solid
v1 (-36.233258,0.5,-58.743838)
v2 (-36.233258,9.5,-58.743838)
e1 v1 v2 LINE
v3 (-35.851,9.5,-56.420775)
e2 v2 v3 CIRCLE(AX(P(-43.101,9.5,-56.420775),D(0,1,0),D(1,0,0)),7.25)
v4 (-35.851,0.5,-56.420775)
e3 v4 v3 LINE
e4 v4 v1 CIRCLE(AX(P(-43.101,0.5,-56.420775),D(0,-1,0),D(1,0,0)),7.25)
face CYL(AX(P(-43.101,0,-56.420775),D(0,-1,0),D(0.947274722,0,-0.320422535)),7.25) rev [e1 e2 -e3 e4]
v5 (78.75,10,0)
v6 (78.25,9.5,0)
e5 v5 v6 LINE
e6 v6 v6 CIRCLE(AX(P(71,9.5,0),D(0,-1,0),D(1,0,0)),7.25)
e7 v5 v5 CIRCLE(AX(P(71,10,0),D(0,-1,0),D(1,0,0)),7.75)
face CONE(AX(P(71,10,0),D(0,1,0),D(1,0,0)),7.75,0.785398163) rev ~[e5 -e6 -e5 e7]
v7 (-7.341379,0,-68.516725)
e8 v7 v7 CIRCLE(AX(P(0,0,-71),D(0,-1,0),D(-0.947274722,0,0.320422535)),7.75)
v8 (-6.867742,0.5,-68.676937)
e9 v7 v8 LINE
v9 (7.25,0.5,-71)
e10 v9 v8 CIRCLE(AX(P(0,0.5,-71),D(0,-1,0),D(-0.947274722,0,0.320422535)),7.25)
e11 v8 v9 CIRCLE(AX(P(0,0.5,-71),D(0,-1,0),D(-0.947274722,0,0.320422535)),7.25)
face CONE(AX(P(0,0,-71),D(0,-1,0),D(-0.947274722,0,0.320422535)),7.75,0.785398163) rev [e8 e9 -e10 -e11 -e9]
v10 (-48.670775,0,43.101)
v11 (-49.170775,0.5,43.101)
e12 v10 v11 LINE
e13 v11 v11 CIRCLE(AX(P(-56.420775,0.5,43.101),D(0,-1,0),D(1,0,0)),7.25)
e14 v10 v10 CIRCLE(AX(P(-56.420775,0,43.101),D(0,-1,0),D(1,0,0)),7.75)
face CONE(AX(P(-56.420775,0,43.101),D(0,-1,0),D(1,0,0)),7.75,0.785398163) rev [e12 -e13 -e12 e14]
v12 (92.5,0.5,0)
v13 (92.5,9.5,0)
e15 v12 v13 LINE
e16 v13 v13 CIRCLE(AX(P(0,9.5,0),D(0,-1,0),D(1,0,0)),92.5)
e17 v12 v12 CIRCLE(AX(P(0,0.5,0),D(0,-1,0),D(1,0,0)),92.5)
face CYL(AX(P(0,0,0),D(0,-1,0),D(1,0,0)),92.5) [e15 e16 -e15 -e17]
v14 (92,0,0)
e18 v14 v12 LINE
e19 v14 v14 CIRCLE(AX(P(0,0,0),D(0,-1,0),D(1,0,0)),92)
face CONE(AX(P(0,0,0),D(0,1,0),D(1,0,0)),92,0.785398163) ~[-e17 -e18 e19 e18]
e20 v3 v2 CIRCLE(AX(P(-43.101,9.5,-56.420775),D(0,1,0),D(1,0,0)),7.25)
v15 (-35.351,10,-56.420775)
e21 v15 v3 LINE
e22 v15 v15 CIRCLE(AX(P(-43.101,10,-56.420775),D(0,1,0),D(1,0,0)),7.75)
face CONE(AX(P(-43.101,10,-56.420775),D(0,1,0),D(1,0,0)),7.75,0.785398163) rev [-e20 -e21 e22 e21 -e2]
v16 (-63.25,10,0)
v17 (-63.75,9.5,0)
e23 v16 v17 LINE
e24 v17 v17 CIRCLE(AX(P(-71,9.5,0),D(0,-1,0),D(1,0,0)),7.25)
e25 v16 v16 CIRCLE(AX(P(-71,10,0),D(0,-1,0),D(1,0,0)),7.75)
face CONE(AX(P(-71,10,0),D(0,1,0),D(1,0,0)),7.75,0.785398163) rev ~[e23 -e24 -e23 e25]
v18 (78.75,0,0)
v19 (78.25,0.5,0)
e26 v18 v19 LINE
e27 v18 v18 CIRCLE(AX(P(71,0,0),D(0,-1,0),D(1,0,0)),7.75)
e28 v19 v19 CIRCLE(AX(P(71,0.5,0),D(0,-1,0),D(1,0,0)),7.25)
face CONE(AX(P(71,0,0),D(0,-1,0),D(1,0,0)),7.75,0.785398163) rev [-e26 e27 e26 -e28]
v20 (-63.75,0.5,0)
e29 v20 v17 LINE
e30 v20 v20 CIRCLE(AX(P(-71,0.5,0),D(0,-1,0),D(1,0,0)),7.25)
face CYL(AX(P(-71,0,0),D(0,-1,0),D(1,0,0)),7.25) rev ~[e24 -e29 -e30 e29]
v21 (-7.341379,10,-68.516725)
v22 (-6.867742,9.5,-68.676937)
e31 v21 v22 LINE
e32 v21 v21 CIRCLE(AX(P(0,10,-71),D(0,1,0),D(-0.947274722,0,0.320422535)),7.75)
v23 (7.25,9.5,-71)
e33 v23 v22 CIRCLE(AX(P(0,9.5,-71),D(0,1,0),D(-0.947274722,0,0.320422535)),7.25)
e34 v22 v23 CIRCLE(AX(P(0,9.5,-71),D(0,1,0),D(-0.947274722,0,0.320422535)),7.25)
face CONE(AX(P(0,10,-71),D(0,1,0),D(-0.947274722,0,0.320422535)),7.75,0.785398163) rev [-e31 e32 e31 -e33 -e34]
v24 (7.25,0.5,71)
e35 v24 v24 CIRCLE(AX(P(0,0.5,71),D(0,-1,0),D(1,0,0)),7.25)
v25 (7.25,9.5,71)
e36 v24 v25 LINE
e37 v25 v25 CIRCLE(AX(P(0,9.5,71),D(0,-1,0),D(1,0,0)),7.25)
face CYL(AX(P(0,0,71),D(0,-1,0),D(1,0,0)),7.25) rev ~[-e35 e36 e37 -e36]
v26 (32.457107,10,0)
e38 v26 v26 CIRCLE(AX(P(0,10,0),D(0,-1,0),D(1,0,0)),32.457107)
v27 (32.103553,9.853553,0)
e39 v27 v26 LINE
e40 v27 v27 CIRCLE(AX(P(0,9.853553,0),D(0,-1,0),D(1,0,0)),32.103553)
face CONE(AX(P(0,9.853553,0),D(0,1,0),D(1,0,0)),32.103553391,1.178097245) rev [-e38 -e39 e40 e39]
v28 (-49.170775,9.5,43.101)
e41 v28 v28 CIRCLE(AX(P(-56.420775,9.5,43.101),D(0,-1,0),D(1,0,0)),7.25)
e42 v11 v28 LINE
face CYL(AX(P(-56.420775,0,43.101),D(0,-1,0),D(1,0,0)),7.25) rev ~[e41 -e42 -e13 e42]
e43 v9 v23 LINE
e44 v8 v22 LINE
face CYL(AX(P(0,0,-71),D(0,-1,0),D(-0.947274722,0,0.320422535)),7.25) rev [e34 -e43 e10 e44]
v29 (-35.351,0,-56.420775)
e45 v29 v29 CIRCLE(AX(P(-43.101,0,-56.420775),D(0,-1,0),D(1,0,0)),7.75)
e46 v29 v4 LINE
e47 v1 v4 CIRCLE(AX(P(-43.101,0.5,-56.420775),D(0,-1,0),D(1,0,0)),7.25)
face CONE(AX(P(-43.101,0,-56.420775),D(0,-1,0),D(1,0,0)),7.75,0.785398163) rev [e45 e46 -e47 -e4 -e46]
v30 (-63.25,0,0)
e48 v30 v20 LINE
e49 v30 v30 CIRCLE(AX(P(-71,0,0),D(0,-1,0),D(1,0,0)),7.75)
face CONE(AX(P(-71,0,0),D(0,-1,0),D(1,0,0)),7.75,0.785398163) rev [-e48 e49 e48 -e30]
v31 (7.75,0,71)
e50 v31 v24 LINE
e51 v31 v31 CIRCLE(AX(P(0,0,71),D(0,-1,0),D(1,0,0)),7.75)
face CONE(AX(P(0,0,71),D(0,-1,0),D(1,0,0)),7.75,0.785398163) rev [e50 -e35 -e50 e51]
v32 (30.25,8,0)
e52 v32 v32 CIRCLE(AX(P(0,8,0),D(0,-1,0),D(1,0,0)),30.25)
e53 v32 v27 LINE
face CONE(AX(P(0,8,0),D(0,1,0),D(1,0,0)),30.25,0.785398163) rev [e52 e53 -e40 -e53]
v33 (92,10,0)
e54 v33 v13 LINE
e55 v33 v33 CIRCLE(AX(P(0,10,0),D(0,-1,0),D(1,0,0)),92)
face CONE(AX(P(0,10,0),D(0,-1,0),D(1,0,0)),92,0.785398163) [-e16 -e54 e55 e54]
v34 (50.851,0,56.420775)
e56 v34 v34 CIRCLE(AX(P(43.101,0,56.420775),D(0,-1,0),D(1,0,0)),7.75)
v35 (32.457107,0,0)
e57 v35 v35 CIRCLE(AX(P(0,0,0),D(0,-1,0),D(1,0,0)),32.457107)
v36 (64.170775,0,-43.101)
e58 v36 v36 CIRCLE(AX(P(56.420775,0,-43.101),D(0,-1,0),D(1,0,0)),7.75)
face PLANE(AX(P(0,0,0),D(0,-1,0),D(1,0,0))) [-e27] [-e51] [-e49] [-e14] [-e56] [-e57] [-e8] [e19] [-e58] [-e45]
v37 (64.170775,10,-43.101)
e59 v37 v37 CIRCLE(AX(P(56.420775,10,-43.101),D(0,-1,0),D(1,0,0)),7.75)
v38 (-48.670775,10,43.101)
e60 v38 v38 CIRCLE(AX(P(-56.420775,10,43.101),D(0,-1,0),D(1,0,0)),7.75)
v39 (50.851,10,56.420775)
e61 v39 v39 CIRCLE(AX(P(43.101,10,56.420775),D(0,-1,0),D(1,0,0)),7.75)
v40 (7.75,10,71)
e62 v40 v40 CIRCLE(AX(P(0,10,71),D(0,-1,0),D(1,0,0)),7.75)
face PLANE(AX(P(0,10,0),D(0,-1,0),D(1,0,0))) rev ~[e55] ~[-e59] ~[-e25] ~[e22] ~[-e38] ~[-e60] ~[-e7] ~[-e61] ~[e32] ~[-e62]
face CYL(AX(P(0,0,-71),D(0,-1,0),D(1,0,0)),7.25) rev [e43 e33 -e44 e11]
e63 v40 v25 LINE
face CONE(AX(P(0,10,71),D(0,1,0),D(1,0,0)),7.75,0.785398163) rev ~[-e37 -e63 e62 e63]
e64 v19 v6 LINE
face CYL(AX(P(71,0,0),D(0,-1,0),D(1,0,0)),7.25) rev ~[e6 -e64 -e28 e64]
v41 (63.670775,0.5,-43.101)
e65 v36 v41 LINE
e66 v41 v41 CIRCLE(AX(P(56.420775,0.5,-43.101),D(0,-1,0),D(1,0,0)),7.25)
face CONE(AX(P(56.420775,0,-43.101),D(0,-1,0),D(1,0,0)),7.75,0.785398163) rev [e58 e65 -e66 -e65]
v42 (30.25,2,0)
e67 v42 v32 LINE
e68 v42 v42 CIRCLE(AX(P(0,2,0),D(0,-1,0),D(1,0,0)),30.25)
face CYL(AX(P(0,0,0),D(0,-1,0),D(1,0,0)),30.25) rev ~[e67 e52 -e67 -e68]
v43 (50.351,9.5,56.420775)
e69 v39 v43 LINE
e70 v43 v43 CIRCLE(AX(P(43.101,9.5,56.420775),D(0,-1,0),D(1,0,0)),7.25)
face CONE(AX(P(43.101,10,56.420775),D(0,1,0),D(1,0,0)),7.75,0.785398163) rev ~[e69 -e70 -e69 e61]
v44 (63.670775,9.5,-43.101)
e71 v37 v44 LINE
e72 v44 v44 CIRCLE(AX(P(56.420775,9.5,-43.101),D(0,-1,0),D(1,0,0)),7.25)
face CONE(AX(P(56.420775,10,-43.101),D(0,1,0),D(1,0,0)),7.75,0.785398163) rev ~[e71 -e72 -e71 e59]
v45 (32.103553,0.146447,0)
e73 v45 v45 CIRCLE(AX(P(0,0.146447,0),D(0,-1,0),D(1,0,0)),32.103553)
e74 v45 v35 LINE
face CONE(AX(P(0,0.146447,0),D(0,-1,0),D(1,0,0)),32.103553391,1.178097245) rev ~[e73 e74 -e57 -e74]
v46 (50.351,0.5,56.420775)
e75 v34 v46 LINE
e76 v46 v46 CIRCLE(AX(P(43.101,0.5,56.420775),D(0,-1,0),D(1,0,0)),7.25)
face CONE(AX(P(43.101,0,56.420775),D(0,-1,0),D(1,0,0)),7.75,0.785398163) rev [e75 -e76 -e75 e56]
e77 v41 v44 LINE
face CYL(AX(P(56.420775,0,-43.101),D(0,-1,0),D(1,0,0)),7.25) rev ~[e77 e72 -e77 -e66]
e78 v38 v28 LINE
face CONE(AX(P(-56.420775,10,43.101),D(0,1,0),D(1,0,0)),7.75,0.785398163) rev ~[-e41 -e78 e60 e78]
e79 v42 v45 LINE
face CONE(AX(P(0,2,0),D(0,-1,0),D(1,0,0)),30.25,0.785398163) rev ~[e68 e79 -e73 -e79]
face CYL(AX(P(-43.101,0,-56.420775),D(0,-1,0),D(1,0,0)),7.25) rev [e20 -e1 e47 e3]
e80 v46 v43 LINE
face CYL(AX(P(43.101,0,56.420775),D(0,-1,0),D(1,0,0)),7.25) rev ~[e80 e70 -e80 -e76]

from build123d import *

# Parameters (mm, degrees)
F0_R     = 92.5
F0_R_2   = 7.25
F0_R_3   = 30.25
F1_DEPTH = 10
F2_SIZE2 = 2
F2_SIZE  = 2
F3_SIZE2 = 2
F3_SIZE  = 2


# Not quite as in the source:
# - a fillet or chamfer that OpenCascade refuses, or shapes differently, is made with other operations: its cross-section is extruded or revolved along the edge and cut away or added


with BuildPart() as f1:
    # F0 (on Front) → F1 (new body)
    with BuildSketch(Plane.XZ):
        Circle(F0_R)
        with BuildLine():
            ThreePointArc((-35.8509998507, -56.4207746479), (-35.9472026921, -57.5979263852), (-36.2332581163, -58.7438380282))
            ThreePointArc((-36.2332581163, -58.7438380282), (-50.2547970094, -55.2436229106), (-35.8509998507, -56.4207746479))
        make_face(mode=Mode.SUBTRACT)
        with BuildLine():
            ThreePointArc((-6.8677417345, -68.6769366197), (1.1771517373, -63.8462028413), (7.25, -71))
            ThreePointArc((7.25, -71), (-1.1771517373, -78.1537971587), (-6.8677417345, -68.6769366197))
        make_face(mode=Mode.SUBTRACT)
        with Locations((56.4207746479, -43.1009998507)):
            Circle(F0_R_2, mode=Mode.SUBTRACT)
        with Locations((-71, 0)):
            Circle(F0_R_2, mode=Mode.SUBTRACT)
        with Locations((-56.4207746479, 43.1009998507)):
            Circle(F0_R_2, mode=Mode.SUBTRACT)
        Circle(F0_R_3, mode=Mode.SUBTRACT)
        with Locations((71, 0)):
            Circle(F0_R_2, mode=Mode.SUBTRACT)
        with Locations((43.1009998507, 56.4207746479)):
            Circle(F0_R_2, mode=Mode.SUBTRACT)
        with Locations((0, 71)):
            Circle(F0_R_2, mode=Mode.SUBTRACT)
    extrude(amount=-F1_DEPTH)

    # F2
    f2_edges = [f1.edges().sort_by_distance(p)[0] for p in [
        (-30.25, 0, 0),
    ]]
    chamfer(f2_edges, length=F2_SIZE, length2=F2_SIZE2)

    # F3
    f3_edges = [f1.edges().sort_by_distance(p)[0] for p in [
        (-30.25, 10, 0),
    ]]
    chamfer(f3_edges, length=F3_SIZE, length2=F3_SIZE2)

    # F4: chamfer of 0.5 on 10 edges, made by hand

    # F4_s1 → F4_t2 (revolve, cut)
    with BuildSketch(Plane.XY):
        Polygon((32.1035533906, 9.8535533906), (32.4571067812, 10), (32.25, 10), align=None)
    revolve(axis=Axis((0, 10, 0), (0, -1, 0)), mode=Mode.SUBTRACT)

    # F4_s3 → F4_t4 (revolve, cut)
    with BuildSketch(Plane.XY):
        Polygon((92, 10), (92.5, 9.5), (92.5, 10), align=None)
    revolve(axis=Axis((0, 10, 0), (0, -1, 0)), mode=Mode.SUBTRACT)

    # F4_s5 → F4_t6 (revolve, cut)
    with BuildSketch(Plane.XY.offset(-56.4207746479)):
        Polygon((-35.3509998507, 10), (-35.8509998507, 9.5), (-35.8509998507, 10), align=None)
    revolve(axis=Axis((-43.1009998507, 10, -56.4207746479), (0, 1, 0)), mode=Mode.SUBTRACT)

    # F4_s7 → F4_t8 (revolve, cut)
    with BuildSketch(Plane(origin=(-21.5504999254, 0, -63.7103873239), x_dir=(0, 1, 0), z_dir=(-0.3204225352, 0, -0.947274722))):
        Polygon((10, 15), (9.5, 15.5), (10, 15.5), align=None)
    revolve(axis=Axis((0, 10, -71), (0, 1, 0)), mode=Mode.SUBTRACT)

    # F4_s9 → F4_t10 (revolve, cut)
    with BuildSketch(Plane.XY.offset(-43.1009998507)):
        Polygon((64.1707746479, 10), (63.6707746479, 9.5), (63.6707746479, 10), align=None)
    revolve(axis=Axis((56.4207746479, 10, -43.1009998507), (0, -1, 0)), mode=Mode.SUBTRACT)

    # F4_s11 → F4_t12 (revolve, cut)
    with BuildSketch(Plane.XY):
        Polygon((-63.25, 10), (-63.75, 9.5), (-63.75, 10), align=None)
    revolve(axis=Axis((-71, 10, 0), (0, -1, 0)), mode=Mode.SUBTRACT)

    # F4_s13 → F4_t14 (revolve, cut)
    with BuildSketch(Plane.XY.offset(43.1009998507)):
        Polygon((-48.6707746479, 10), (-49.1707746479, 9.5), (-49.1707746479, 10), align=None)
    revolve(axis=Axis((-56.4207746479, 10, 43.1009998507), (0, -1, 0)), mode=Mode.SUBTRACT)

    # F4_s15 → F4_t16 (revolve, cut)
    with BuildSketch(Plane.XY):
        Polygon((78.75, 10), (78.25, 9.5), (78.25, 10), align=None)
    revolve(axis=Axis((71, 10, 0), (0, -1, 0)), mode=Mode.SUBTRACT)

    # F4_s17 → F4_t18 (revolve, cut)
    with BuildSketch(Plane.XY.offset(56.4207746479)):
        Polygon((50.8509998507, 10), (50.3509998507, 9.5), (50.3509998507, 10), align=None)
    revolve(axis=Axis((43.1009998507, 10, 56.4207746479), (0, -1, 0)), mode=Mode.SUBTRACT)

    # F4_s19 → F4_t20 (revolve, cut)
    with BuildSketch(Plane.XY.offset(71)):
        Polygon((7.75, 10), (7.25, 9.5), (7.25, 10), align=None)
    revolve(axis=Axis((0, 10, 71), (0, -1, 0)), mode=Mode.SUBTRACT)

    # F5: chamfer of 0.5 on 10 edges, made by hand

    # F5_s1 → F5_t2 (revolve, cut)
    with BuildSketch(Plane.XY):
        Polygon((32.1035533906, 0.1464466094), (32.4571067812, 0), (32.25, 0), align=None)
    revolve(axis=Axis((0, 0, 0), (0, -1, 0)), mode=Mode.SUBTRACT)

    # F5_s3 → F5_t4 (revolve, cut)
    with BuildSketch(Plane.XY):
        Polygon((92, 0), (92.5, 0.5), (92.5, 0), align=None)
    revolve(axis=Axis((0, 0, 0), (0, -1, 0)), mode=Mode.SUBTRACT)

    # F5_s5 → F5_t6 (revolve, cut)
    with BuildSketch(Plane.XY.offset(-56.4207746479)):
        Polygon((-35.3509998507, 0), (-35.8509998507, 0.5), (-35.8509998507, 0), align=None)
    revolve(axis=Axis((-43.1009998507, 0, -56.4207746479), (0, -1, 0)), mode=Mode.SUBTRACT)

    # F5_s7 → F5_t8 (revolve, cut)
    with BuildSketch(Plane(origin=(-21.5504999254, 0, -63.7103873239), x_dir=(0, 1, 0), z_dir=(0.3204225352, 0, 0.947274722))):
        Polygon((0, -15), (0.5, -15.5), (0, -15.5), align=None)
    revolve(axis=Axis((0, 0, -71), (0, -1, 0)), mode=Mode.SUBTRACT)

    # F5_s9 → F5_t10 (revolve, cut)
    with BuildSketch(Plane.XY.offset(-43.1009998507)):
        Polygon((64.1707746479, 0), (63.6707746479, 0.5), (63.6707746479, 0), align=None)
    revolve(axis=Axis((56.4207746479, 0, -43.1009998507), (0, -1, 0)), mode=Mode.SUBTRACT)

    # F5_s11 → F5_t12 (revolve, cut)
    with BuildSketch(Plane.XY):
        Polygon((-63.25, 0), (-63.75, 0.5), (-63.75, 0), align=None)
    revolve(axis=Axis((-71, 0, 0), (0, -1, 0)), mode=Mode.SUBTRACT)

    # F5_s13 → F5_t14 (revolve, cut)
    with BuildSketch(Plane.XY.offset(43.1009998507)):
        Polygon((-48.6707746479, 0), (-49.1707746479, 0.5), (-49.1707746479, 0), align=None)
    revolve(axis=Axis((-56.4207746479, 0, 43.1009998507), (0, -1, 0)), mode=Mode.SUBTRACT)

    # F5_s15 → F5_t16 (revolve, cut)
    with BuildSketch(Plane.XY):
        Polygon((78.75, 0), (78.25, 0.5), (78.25, 0), align=None)
    revolve(axis=Axis((71, 0, 0), (0, -1, 0)), mode=Mode.SUBTRACT)

    # F5_s17 → F5_t18 (revolve, cut)
    with BuildSketch(Plane.XY.offset(56.4207746479)):
        Polygon((50.8509998507, 0), (50.3509998507, 0.5), (50.3509998507, 0), align=None)
    revolve(axis=Axis((43.1009998507, 0, 56.4207746479), (0, -1, 0)), mode=Mode.SUBTRACT)

    # F5_s19 → F5_t20 (revolve, cut)
    with BuildSketch(Plane.XY.offset(71)):
        Polygon((7.75, 0), (7.25, 0.5), (7.25, 0), align=None)
    revolve(axis=Axis((0, 0, 71), (0, -1, 0)), mode=Mode.SUBTRACT)


solid = f1.part
